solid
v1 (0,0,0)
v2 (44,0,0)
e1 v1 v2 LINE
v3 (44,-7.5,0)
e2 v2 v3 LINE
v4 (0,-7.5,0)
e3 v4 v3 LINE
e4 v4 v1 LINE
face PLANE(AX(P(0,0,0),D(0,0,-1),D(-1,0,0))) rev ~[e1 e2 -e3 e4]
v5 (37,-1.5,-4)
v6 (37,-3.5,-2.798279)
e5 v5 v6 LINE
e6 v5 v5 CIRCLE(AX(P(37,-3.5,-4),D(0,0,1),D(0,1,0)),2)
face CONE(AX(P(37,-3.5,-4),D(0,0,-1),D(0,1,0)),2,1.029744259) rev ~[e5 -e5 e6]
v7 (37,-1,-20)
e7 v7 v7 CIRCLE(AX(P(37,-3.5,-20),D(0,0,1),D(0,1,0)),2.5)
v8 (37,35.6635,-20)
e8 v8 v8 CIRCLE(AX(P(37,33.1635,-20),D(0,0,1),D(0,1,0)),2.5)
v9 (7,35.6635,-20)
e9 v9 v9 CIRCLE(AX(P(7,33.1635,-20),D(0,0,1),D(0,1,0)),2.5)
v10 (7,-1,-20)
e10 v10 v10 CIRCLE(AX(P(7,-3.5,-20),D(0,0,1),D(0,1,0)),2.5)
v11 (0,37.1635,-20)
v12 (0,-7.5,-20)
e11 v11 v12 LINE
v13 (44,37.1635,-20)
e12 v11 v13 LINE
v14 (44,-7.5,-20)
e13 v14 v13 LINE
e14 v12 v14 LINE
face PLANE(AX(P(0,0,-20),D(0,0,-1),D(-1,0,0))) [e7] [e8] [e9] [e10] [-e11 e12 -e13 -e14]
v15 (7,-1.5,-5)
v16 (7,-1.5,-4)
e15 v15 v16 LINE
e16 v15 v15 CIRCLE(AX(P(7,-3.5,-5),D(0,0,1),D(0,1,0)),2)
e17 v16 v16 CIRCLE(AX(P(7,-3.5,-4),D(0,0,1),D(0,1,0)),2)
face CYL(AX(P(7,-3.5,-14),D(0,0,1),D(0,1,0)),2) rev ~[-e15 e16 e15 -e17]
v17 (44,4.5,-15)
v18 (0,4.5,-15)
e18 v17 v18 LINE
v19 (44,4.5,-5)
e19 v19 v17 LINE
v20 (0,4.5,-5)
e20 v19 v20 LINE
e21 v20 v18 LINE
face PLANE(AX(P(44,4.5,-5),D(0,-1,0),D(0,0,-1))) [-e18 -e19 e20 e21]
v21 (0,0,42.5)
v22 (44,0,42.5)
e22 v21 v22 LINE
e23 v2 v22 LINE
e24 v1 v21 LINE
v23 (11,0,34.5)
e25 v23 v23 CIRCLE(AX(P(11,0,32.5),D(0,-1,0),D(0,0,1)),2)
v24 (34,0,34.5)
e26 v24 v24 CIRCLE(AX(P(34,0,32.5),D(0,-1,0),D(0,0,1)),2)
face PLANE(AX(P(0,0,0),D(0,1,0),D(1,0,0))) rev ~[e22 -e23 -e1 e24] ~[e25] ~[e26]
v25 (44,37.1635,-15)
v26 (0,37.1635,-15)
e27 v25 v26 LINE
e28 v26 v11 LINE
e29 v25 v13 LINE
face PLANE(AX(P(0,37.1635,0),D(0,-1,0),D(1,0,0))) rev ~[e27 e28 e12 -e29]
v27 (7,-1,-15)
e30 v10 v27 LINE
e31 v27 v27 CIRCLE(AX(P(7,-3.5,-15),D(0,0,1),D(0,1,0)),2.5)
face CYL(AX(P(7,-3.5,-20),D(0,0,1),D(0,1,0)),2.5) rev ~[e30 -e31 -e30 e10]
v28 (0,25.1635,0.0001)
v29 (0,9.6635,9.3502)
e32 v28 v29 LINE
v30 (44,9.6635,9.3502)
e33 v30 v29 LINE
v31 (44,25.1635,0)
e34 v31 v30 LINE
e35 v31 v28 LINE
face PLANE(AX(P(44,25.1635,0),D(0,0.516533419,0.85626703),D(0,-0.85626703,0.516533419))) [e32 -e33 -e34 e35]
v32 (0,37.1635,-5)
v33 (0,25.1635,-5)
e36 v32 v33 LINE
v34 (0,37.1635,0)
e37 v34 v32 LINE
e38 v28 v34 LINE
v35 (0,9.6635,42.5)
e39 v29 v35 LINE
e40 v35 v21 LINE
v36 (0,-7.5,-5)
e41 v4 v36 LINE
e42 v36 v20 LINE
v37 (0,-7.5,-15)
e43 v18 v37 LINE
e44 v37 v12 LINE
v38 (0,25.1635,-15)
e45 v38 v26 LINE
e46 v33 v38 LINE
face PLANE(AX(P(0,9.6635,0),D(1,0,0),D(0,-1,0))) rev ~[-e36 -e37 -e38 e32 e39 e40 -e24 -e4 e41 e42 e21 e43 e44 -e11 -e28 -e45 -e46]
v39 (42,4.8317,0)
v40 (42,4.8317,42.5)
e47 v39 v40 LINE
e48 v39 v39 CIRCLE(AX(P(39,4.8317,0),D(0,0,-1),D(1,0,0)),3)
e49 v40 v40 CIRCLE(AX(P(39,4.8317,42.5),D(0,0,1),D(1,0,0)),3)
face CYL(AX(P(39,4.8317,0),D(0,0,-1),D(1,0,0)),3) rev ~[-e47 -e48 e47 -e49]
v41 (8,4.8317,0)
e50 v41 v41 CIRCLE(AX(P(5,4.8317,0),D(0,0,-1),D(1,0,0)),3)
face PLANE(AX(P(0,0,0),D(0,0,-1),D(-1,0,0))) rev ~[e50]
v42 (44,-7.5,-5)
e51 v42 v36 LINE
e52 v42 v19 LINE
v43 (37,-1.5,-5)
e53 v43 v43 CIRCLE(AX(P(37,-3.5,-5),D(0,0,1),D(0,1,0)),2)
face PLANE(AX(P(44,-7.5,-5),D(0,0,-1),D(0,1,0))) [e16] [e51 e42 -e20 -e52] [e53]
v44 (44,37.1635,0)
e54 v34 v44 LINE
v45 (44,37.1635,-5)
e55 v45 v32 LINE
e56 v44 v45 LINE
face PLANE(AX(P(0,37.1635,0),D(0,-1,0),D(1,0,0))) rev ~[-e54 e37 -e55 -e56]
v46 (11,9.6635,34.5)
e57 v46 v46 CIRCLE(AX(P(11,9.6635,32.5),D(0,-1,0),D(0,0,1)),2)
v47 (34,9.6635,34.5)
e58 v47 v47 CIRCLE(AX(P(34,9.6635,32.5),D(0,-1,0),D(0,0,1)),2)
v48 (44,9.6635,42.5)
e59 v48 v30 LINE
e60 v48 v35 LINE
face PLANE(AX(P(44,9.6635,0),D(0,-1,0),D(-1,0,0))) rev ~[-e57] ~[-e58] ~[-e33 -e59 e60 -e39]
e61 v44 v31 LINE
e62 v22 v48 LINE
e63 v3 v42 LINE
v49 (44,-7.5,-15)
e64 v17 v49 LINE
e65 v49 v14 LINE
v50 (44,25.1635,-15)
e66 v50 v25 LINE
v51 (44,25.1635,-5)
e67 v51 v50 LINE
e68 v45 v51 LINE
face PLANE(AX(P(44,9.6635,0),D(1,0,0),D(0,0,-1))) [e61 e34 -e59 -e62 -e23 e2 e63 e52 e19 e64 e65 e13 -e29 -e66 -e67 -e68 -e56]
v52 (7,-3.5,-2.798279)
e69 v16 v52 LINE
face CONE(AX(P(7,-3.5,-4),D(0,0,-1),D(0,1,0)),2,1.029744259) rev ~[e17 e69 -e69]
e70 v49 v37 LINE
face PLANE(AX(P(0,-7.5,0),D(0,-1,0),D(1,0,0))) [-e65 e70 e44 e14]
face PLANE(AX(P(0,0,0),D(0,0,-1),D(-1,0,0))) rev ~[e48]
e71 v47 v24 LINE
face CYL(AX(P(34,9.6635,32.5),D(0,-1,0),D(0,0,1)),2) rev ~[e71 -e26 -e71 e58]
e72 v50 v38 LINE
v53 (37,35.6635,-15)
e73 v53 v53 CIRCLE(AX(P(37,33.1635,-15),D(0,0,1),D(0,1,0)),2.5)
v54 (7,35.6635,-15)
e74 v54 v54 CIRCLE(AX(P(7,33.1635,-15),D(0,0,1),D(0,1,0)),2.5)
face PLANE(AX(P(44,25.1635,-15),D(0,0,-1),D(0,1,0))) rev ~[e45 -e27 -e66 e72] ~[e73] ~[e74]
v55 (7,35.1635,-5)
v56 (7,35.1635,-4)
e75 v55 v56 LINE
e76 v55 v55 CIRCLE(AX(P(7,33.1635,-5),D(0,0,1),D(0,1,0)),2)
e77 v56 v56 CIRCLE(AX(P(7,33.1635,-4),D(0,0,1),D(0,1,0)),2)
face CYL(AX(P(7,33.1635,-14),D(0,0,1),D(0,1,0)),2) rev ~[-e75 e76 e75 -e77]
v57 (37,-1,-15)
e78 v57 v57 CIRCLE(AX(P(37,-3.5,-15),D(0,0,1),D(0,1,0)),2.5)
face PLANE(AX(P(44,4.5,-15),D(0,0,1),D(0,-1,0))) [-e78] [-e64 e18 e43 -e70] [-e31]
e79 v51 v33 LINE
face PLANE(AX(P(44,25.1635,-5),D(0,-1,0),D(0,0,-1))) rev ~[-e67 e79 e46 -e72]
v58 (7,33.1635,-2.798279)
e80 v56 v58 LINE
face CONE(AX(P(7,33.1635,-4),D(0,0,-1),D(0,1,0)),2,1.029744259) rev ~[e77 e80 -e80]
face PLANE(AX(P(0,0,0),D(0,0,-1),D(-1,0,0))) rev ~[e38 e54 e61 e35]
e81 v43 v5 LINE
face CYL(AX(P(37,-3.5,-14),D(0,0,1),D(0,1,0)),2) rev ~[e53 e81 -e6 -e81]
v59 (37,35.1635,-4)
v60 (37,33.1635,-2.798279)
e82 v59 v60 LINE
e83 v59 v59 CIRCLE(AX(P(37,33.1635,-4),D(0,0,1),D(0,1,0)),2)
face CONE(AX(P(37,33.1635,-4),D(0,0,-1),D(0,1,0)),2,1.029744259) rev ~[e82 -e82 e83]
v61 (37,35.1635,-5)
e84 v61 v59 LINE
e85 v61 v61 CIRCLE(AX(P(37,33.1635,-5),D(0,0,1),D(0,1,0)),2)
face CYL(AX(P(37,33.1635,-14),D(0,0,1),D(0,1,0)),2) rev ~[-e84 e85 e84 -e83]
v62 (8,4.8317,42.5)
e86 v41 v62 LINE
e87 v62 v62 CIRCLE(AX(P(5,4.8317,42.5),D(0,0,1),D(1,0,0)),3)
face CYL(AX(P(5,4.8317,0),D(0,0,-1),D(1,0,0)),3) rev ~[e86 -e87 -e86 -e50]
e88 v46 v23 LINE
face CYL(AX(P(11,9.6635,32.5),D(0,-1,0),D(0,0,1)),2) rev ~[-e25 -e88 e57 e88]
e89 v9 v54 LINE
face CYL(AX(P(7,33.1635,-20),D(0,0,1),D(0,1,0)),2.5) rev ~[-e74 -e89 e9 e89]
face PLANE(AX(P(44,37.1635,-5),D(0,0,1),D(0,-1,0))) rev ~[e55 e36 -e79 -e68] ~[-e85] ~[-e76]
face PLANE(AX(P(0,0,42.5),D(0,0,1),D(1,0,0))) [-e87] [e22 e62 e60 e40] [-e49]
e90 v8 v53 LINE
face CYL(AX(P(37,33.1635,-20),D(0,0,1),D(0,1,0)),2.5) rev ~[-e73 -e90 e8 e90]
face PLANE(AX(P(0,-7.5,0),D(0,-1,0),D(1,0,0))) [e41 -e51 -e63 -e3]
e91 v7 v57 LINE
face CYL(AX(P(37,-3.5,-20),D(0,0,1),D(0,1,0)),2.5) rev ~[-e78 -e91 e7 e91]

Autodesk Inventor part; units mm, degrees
ref_plane "YZ Plane" through (0, 0, 0) normal (1, 0, 0) x (0, 1, 0)
ref_plane "XZ Plane" through (0, 0, 0) normal (0, 1, 0) x (-1, 0, 0)
sketch "Sketch1" plane through (0, 0, 0) normal (0, 0, 1) x (1, 0, 0)
  line L0 (0, 0) -> (44, 0)
  line L1 (44, 0) -> (44, 9.6635)
  line L2 (44, 9.6635) -> (0, 9.6635)
  line L3 (0, 9.6635) -> (0, 0)
  circle A0 centre (5, 4.8317) radius 3
  circle A1 centre (39, 4.8317) radius 3
  dimension "d0" = 6
  dimension "d1" = 6
  dimension "d2" = 34
  dimension "d3" = 44
  dimension "d4" = 5
extrude "Extrusion1" add sketch "Sketch1" along normal blind 42.5
sketch "Sketch2" plane through (0, 9.6635, 0) normal (0, 1, 0) x (1, 0, 0)
  line L0 (44, 0) -> (0, 0) projected
  line L1 (0, 0) -> (0, -42.5) projected
  line L2 (8, -42.5) -> (42, -42.5) projected
  point P0 (11, -32.5)
  point P1 (0, -40.5)
  dimension "d17" = 10
  dimension "d18" = 11
hole "Hole1" at (11, 9.6635, 32.5) direction (0, -1, 0) diameter 4 depth 10 tip angle 118
sketch "Sketch3" plane through (0, 9.6635, 0) normal (0, 1, 0) x (1, 0, 0)
  line L0 (8, -42.5) -> (42, -42.5) projected
  line L1 (44, 0) -> (44, -42.5) projected
  point P0 (0, 0)
  point P1 (34, -32.5)
  point P2 (44, -40.5)
  dimension "d19" = 10
  dimension "d20" = 10
hole "Hole2" at (34, 9.6635, 32.5) direction (0, -1, 0) diameter 4 depth 10 tip angle 118
sketch "Sketch4" plane through (0, 0, 0) normal (0, 0, -1) x (-1, 0, 0)
  line L0 (0, -7.5) -> (-44, -7.5)
  line L1 (-44, -7.5) -> (-44, 0)
  line L2 (-44, 0) -> (0, 0)
  line L3 (0, 0) -> (0, -7.5)
  line L4 (-44, 9.6635) -> (0, 9.6635)
  line L5 (0, 9.6635) -> (0, 37.1635)
  line L6 (0, 37.1635) -> (-44, 37.1635)
  line L7 (-44, 37.1635) -> (-44, 9.6635)
  circle A0 centre (-39, 4.8317) radius 3 projected
  circle A1 centre (-5, 4.8317) radius 3 projected
  line L8 (0, 0) -> (-44, 0) projected
  line L9 (0, 9.6635) -> (0, 0) projected
  line L10 (-44, 9.6635) -> (0, 9.6635) projected
  line L11 (-44, 0) -> (-44, 9.6635) projected
  dimension "d28" = 7.5
  dimension "d29" = 27.5
extrude "Extrusion2" add sketch "Sketch4" along normal blind 20
sketch "Sketch5" plane through (0, 0, -20) normal (0, 0, -1) x (-1, 0, 0)
  arc A0 (-8, 4.8317) -> (-8, 4.8317) centre (-5, 4.8317) ccw projected
  circle A1 centre (-5, 4.8317) radius 3
  circle A2 centre (-39, 4.8317) radius 3 projected
  circle A3 centre (-39, 4.8317) radius 3
  point P0 (0, 0)
extrude "Extrusion3" add sketch "Sketch5" against normal blind 20
ref_plane "Work Plane2" through (44, 0, 40.5) normal (1, 0, 0) x (0, 0, -1)
sketch "Sketch6" plane through (44, 0, 40.5) normal (1, 0, 0) x (0, 0, -1)
  line L0 (55.5, 37.1635) -> (45.5, 37.1635)
  line L1 (45.5, 37.1635) -> (45.5, 25.1635)
  line L2 (45.5, 25.1635) -> (55.5, 25.1635)
  line L3 (55.5, 25.1635) -> (55.5, 37.1635)
  line L4 (60.5, 37.1635) -> (60.5, -7.5) projected
  line L5 (40.5, -7.5) -> (60.5, -7.5) projected
  line L6 (55.5, -7.5) -> (45.5, -7.5)
  line L7 (45.5, -7.5) -> (45.5, 4.5)
  line L8 (45.5, 4.5) -> (55.5, 4.5)
  line L9 (55.5, 4.5) -> (55.5, -7.5)
  line L10 (40.5, 37.1635) -> (60.5, 37.1635) projected
  point P0 (40.5, 0)
  dimension "d34" = 10
  dimension "d35" = 5
  dimension "d36" = 12
  dimension "d37" = 12
  dimension "d55" = 0
extrude "Extrusion4" cut sketch "Sketch6" against normal through all
sketch "Sketch7" plane through (0, 0, -20) normal (0, 0, -1) x (-1, 0, 0)
  line L0 (0, 0) -> (-44, 0) projected
  line L1 (0, 37.1635) -> (-44, 37.1635) projected
  line L2 (-44, -7.5) -> (0, -7.5) projected
  line L3 (0, -7.5) -> (0, 37.1635) projected
  line L4 (-44, 37.1635) -> (-44, -7.5) projected
  point P0 (-37, -3.5)
  point P1 (-7, 33.1635)
  point P2 (-37, 33.1635)
  point P3 (-7, -3.5)
  dimension "d40" = 4
  dimension "d41" = 4
  dimension "d42" = 4
  dimension "d43" = 4
  dimension "d44" = 7
  dimension "d45" = 7
  dimension "d46" = 7
  dimension "d47" = 7
hole "Hole3" at (37, -3.5, -20) at (7, 33.1635, -20) at (37, 33.1635, -20) at (7, -3.5, -20) direction (0, 0, 1) diameter 4 depth 16 tip angle 118 counterbore diameter 5 counterbore depth 6
sketch "Sketch8" plane through (0, 0, 0) normal (0, 0, 1) x (1, 0, 0)
  line L0 (44, 25.1635) -> (0, 25.1635) projected
  line L1 (0, 9.6635) -> (5, 9.6635)
  line L2 (5, 9.6635) -> (5, 25.1635)
  line L3 (5, 25.1635) -> (0, 25.1635)
  line L4 (0, 25.1635) -> (0, 9.6635)
  point P0 (0, 0)
  dimension "d56" = 5
extrude "Extrusion5" add sketch "Sketch8" along normal blind 15.5
chamfer "Chamfer1" distance 15.5 angle 45 1 edges at (2.5, 25.1635, 15.5)
sketch "Sketch9" plane through (5, 9.6635, 0) normal (1, 0, 0) x (0, 0, -1)
  line L0 (-15.5, 0) -> (0, 15.5) projected
  line L1 (0, 0) -> (-15.5, 0) projected
  line L2 (0, 15.5) -> (0, 0) projected
  point P0 (0, -9.6635)
extrude "Extrusion6" add sketch "Sketch9" along normal up to surface (39 mm away)
sketch "Sketch11" plane through (44, 0, 42.5) normal (1, 0, 0) x (0, 0, -1)
  line L0 (42.5, 25.1635) -> (33.1498, 9.6635)
  line L1 (33.1498, 9.6635) -> (27, 9.6635)
  line L2 (27, 9.6635) -> (42.5, 25.1635)
  line L3 (42.5, 25.1635) -> (27, 9.6635) projected
  point P0 (42.5, 0)
extrude "Extrusion7" cut sketch "Sketch11" against normal through all
properties part number "X smooth mount"
